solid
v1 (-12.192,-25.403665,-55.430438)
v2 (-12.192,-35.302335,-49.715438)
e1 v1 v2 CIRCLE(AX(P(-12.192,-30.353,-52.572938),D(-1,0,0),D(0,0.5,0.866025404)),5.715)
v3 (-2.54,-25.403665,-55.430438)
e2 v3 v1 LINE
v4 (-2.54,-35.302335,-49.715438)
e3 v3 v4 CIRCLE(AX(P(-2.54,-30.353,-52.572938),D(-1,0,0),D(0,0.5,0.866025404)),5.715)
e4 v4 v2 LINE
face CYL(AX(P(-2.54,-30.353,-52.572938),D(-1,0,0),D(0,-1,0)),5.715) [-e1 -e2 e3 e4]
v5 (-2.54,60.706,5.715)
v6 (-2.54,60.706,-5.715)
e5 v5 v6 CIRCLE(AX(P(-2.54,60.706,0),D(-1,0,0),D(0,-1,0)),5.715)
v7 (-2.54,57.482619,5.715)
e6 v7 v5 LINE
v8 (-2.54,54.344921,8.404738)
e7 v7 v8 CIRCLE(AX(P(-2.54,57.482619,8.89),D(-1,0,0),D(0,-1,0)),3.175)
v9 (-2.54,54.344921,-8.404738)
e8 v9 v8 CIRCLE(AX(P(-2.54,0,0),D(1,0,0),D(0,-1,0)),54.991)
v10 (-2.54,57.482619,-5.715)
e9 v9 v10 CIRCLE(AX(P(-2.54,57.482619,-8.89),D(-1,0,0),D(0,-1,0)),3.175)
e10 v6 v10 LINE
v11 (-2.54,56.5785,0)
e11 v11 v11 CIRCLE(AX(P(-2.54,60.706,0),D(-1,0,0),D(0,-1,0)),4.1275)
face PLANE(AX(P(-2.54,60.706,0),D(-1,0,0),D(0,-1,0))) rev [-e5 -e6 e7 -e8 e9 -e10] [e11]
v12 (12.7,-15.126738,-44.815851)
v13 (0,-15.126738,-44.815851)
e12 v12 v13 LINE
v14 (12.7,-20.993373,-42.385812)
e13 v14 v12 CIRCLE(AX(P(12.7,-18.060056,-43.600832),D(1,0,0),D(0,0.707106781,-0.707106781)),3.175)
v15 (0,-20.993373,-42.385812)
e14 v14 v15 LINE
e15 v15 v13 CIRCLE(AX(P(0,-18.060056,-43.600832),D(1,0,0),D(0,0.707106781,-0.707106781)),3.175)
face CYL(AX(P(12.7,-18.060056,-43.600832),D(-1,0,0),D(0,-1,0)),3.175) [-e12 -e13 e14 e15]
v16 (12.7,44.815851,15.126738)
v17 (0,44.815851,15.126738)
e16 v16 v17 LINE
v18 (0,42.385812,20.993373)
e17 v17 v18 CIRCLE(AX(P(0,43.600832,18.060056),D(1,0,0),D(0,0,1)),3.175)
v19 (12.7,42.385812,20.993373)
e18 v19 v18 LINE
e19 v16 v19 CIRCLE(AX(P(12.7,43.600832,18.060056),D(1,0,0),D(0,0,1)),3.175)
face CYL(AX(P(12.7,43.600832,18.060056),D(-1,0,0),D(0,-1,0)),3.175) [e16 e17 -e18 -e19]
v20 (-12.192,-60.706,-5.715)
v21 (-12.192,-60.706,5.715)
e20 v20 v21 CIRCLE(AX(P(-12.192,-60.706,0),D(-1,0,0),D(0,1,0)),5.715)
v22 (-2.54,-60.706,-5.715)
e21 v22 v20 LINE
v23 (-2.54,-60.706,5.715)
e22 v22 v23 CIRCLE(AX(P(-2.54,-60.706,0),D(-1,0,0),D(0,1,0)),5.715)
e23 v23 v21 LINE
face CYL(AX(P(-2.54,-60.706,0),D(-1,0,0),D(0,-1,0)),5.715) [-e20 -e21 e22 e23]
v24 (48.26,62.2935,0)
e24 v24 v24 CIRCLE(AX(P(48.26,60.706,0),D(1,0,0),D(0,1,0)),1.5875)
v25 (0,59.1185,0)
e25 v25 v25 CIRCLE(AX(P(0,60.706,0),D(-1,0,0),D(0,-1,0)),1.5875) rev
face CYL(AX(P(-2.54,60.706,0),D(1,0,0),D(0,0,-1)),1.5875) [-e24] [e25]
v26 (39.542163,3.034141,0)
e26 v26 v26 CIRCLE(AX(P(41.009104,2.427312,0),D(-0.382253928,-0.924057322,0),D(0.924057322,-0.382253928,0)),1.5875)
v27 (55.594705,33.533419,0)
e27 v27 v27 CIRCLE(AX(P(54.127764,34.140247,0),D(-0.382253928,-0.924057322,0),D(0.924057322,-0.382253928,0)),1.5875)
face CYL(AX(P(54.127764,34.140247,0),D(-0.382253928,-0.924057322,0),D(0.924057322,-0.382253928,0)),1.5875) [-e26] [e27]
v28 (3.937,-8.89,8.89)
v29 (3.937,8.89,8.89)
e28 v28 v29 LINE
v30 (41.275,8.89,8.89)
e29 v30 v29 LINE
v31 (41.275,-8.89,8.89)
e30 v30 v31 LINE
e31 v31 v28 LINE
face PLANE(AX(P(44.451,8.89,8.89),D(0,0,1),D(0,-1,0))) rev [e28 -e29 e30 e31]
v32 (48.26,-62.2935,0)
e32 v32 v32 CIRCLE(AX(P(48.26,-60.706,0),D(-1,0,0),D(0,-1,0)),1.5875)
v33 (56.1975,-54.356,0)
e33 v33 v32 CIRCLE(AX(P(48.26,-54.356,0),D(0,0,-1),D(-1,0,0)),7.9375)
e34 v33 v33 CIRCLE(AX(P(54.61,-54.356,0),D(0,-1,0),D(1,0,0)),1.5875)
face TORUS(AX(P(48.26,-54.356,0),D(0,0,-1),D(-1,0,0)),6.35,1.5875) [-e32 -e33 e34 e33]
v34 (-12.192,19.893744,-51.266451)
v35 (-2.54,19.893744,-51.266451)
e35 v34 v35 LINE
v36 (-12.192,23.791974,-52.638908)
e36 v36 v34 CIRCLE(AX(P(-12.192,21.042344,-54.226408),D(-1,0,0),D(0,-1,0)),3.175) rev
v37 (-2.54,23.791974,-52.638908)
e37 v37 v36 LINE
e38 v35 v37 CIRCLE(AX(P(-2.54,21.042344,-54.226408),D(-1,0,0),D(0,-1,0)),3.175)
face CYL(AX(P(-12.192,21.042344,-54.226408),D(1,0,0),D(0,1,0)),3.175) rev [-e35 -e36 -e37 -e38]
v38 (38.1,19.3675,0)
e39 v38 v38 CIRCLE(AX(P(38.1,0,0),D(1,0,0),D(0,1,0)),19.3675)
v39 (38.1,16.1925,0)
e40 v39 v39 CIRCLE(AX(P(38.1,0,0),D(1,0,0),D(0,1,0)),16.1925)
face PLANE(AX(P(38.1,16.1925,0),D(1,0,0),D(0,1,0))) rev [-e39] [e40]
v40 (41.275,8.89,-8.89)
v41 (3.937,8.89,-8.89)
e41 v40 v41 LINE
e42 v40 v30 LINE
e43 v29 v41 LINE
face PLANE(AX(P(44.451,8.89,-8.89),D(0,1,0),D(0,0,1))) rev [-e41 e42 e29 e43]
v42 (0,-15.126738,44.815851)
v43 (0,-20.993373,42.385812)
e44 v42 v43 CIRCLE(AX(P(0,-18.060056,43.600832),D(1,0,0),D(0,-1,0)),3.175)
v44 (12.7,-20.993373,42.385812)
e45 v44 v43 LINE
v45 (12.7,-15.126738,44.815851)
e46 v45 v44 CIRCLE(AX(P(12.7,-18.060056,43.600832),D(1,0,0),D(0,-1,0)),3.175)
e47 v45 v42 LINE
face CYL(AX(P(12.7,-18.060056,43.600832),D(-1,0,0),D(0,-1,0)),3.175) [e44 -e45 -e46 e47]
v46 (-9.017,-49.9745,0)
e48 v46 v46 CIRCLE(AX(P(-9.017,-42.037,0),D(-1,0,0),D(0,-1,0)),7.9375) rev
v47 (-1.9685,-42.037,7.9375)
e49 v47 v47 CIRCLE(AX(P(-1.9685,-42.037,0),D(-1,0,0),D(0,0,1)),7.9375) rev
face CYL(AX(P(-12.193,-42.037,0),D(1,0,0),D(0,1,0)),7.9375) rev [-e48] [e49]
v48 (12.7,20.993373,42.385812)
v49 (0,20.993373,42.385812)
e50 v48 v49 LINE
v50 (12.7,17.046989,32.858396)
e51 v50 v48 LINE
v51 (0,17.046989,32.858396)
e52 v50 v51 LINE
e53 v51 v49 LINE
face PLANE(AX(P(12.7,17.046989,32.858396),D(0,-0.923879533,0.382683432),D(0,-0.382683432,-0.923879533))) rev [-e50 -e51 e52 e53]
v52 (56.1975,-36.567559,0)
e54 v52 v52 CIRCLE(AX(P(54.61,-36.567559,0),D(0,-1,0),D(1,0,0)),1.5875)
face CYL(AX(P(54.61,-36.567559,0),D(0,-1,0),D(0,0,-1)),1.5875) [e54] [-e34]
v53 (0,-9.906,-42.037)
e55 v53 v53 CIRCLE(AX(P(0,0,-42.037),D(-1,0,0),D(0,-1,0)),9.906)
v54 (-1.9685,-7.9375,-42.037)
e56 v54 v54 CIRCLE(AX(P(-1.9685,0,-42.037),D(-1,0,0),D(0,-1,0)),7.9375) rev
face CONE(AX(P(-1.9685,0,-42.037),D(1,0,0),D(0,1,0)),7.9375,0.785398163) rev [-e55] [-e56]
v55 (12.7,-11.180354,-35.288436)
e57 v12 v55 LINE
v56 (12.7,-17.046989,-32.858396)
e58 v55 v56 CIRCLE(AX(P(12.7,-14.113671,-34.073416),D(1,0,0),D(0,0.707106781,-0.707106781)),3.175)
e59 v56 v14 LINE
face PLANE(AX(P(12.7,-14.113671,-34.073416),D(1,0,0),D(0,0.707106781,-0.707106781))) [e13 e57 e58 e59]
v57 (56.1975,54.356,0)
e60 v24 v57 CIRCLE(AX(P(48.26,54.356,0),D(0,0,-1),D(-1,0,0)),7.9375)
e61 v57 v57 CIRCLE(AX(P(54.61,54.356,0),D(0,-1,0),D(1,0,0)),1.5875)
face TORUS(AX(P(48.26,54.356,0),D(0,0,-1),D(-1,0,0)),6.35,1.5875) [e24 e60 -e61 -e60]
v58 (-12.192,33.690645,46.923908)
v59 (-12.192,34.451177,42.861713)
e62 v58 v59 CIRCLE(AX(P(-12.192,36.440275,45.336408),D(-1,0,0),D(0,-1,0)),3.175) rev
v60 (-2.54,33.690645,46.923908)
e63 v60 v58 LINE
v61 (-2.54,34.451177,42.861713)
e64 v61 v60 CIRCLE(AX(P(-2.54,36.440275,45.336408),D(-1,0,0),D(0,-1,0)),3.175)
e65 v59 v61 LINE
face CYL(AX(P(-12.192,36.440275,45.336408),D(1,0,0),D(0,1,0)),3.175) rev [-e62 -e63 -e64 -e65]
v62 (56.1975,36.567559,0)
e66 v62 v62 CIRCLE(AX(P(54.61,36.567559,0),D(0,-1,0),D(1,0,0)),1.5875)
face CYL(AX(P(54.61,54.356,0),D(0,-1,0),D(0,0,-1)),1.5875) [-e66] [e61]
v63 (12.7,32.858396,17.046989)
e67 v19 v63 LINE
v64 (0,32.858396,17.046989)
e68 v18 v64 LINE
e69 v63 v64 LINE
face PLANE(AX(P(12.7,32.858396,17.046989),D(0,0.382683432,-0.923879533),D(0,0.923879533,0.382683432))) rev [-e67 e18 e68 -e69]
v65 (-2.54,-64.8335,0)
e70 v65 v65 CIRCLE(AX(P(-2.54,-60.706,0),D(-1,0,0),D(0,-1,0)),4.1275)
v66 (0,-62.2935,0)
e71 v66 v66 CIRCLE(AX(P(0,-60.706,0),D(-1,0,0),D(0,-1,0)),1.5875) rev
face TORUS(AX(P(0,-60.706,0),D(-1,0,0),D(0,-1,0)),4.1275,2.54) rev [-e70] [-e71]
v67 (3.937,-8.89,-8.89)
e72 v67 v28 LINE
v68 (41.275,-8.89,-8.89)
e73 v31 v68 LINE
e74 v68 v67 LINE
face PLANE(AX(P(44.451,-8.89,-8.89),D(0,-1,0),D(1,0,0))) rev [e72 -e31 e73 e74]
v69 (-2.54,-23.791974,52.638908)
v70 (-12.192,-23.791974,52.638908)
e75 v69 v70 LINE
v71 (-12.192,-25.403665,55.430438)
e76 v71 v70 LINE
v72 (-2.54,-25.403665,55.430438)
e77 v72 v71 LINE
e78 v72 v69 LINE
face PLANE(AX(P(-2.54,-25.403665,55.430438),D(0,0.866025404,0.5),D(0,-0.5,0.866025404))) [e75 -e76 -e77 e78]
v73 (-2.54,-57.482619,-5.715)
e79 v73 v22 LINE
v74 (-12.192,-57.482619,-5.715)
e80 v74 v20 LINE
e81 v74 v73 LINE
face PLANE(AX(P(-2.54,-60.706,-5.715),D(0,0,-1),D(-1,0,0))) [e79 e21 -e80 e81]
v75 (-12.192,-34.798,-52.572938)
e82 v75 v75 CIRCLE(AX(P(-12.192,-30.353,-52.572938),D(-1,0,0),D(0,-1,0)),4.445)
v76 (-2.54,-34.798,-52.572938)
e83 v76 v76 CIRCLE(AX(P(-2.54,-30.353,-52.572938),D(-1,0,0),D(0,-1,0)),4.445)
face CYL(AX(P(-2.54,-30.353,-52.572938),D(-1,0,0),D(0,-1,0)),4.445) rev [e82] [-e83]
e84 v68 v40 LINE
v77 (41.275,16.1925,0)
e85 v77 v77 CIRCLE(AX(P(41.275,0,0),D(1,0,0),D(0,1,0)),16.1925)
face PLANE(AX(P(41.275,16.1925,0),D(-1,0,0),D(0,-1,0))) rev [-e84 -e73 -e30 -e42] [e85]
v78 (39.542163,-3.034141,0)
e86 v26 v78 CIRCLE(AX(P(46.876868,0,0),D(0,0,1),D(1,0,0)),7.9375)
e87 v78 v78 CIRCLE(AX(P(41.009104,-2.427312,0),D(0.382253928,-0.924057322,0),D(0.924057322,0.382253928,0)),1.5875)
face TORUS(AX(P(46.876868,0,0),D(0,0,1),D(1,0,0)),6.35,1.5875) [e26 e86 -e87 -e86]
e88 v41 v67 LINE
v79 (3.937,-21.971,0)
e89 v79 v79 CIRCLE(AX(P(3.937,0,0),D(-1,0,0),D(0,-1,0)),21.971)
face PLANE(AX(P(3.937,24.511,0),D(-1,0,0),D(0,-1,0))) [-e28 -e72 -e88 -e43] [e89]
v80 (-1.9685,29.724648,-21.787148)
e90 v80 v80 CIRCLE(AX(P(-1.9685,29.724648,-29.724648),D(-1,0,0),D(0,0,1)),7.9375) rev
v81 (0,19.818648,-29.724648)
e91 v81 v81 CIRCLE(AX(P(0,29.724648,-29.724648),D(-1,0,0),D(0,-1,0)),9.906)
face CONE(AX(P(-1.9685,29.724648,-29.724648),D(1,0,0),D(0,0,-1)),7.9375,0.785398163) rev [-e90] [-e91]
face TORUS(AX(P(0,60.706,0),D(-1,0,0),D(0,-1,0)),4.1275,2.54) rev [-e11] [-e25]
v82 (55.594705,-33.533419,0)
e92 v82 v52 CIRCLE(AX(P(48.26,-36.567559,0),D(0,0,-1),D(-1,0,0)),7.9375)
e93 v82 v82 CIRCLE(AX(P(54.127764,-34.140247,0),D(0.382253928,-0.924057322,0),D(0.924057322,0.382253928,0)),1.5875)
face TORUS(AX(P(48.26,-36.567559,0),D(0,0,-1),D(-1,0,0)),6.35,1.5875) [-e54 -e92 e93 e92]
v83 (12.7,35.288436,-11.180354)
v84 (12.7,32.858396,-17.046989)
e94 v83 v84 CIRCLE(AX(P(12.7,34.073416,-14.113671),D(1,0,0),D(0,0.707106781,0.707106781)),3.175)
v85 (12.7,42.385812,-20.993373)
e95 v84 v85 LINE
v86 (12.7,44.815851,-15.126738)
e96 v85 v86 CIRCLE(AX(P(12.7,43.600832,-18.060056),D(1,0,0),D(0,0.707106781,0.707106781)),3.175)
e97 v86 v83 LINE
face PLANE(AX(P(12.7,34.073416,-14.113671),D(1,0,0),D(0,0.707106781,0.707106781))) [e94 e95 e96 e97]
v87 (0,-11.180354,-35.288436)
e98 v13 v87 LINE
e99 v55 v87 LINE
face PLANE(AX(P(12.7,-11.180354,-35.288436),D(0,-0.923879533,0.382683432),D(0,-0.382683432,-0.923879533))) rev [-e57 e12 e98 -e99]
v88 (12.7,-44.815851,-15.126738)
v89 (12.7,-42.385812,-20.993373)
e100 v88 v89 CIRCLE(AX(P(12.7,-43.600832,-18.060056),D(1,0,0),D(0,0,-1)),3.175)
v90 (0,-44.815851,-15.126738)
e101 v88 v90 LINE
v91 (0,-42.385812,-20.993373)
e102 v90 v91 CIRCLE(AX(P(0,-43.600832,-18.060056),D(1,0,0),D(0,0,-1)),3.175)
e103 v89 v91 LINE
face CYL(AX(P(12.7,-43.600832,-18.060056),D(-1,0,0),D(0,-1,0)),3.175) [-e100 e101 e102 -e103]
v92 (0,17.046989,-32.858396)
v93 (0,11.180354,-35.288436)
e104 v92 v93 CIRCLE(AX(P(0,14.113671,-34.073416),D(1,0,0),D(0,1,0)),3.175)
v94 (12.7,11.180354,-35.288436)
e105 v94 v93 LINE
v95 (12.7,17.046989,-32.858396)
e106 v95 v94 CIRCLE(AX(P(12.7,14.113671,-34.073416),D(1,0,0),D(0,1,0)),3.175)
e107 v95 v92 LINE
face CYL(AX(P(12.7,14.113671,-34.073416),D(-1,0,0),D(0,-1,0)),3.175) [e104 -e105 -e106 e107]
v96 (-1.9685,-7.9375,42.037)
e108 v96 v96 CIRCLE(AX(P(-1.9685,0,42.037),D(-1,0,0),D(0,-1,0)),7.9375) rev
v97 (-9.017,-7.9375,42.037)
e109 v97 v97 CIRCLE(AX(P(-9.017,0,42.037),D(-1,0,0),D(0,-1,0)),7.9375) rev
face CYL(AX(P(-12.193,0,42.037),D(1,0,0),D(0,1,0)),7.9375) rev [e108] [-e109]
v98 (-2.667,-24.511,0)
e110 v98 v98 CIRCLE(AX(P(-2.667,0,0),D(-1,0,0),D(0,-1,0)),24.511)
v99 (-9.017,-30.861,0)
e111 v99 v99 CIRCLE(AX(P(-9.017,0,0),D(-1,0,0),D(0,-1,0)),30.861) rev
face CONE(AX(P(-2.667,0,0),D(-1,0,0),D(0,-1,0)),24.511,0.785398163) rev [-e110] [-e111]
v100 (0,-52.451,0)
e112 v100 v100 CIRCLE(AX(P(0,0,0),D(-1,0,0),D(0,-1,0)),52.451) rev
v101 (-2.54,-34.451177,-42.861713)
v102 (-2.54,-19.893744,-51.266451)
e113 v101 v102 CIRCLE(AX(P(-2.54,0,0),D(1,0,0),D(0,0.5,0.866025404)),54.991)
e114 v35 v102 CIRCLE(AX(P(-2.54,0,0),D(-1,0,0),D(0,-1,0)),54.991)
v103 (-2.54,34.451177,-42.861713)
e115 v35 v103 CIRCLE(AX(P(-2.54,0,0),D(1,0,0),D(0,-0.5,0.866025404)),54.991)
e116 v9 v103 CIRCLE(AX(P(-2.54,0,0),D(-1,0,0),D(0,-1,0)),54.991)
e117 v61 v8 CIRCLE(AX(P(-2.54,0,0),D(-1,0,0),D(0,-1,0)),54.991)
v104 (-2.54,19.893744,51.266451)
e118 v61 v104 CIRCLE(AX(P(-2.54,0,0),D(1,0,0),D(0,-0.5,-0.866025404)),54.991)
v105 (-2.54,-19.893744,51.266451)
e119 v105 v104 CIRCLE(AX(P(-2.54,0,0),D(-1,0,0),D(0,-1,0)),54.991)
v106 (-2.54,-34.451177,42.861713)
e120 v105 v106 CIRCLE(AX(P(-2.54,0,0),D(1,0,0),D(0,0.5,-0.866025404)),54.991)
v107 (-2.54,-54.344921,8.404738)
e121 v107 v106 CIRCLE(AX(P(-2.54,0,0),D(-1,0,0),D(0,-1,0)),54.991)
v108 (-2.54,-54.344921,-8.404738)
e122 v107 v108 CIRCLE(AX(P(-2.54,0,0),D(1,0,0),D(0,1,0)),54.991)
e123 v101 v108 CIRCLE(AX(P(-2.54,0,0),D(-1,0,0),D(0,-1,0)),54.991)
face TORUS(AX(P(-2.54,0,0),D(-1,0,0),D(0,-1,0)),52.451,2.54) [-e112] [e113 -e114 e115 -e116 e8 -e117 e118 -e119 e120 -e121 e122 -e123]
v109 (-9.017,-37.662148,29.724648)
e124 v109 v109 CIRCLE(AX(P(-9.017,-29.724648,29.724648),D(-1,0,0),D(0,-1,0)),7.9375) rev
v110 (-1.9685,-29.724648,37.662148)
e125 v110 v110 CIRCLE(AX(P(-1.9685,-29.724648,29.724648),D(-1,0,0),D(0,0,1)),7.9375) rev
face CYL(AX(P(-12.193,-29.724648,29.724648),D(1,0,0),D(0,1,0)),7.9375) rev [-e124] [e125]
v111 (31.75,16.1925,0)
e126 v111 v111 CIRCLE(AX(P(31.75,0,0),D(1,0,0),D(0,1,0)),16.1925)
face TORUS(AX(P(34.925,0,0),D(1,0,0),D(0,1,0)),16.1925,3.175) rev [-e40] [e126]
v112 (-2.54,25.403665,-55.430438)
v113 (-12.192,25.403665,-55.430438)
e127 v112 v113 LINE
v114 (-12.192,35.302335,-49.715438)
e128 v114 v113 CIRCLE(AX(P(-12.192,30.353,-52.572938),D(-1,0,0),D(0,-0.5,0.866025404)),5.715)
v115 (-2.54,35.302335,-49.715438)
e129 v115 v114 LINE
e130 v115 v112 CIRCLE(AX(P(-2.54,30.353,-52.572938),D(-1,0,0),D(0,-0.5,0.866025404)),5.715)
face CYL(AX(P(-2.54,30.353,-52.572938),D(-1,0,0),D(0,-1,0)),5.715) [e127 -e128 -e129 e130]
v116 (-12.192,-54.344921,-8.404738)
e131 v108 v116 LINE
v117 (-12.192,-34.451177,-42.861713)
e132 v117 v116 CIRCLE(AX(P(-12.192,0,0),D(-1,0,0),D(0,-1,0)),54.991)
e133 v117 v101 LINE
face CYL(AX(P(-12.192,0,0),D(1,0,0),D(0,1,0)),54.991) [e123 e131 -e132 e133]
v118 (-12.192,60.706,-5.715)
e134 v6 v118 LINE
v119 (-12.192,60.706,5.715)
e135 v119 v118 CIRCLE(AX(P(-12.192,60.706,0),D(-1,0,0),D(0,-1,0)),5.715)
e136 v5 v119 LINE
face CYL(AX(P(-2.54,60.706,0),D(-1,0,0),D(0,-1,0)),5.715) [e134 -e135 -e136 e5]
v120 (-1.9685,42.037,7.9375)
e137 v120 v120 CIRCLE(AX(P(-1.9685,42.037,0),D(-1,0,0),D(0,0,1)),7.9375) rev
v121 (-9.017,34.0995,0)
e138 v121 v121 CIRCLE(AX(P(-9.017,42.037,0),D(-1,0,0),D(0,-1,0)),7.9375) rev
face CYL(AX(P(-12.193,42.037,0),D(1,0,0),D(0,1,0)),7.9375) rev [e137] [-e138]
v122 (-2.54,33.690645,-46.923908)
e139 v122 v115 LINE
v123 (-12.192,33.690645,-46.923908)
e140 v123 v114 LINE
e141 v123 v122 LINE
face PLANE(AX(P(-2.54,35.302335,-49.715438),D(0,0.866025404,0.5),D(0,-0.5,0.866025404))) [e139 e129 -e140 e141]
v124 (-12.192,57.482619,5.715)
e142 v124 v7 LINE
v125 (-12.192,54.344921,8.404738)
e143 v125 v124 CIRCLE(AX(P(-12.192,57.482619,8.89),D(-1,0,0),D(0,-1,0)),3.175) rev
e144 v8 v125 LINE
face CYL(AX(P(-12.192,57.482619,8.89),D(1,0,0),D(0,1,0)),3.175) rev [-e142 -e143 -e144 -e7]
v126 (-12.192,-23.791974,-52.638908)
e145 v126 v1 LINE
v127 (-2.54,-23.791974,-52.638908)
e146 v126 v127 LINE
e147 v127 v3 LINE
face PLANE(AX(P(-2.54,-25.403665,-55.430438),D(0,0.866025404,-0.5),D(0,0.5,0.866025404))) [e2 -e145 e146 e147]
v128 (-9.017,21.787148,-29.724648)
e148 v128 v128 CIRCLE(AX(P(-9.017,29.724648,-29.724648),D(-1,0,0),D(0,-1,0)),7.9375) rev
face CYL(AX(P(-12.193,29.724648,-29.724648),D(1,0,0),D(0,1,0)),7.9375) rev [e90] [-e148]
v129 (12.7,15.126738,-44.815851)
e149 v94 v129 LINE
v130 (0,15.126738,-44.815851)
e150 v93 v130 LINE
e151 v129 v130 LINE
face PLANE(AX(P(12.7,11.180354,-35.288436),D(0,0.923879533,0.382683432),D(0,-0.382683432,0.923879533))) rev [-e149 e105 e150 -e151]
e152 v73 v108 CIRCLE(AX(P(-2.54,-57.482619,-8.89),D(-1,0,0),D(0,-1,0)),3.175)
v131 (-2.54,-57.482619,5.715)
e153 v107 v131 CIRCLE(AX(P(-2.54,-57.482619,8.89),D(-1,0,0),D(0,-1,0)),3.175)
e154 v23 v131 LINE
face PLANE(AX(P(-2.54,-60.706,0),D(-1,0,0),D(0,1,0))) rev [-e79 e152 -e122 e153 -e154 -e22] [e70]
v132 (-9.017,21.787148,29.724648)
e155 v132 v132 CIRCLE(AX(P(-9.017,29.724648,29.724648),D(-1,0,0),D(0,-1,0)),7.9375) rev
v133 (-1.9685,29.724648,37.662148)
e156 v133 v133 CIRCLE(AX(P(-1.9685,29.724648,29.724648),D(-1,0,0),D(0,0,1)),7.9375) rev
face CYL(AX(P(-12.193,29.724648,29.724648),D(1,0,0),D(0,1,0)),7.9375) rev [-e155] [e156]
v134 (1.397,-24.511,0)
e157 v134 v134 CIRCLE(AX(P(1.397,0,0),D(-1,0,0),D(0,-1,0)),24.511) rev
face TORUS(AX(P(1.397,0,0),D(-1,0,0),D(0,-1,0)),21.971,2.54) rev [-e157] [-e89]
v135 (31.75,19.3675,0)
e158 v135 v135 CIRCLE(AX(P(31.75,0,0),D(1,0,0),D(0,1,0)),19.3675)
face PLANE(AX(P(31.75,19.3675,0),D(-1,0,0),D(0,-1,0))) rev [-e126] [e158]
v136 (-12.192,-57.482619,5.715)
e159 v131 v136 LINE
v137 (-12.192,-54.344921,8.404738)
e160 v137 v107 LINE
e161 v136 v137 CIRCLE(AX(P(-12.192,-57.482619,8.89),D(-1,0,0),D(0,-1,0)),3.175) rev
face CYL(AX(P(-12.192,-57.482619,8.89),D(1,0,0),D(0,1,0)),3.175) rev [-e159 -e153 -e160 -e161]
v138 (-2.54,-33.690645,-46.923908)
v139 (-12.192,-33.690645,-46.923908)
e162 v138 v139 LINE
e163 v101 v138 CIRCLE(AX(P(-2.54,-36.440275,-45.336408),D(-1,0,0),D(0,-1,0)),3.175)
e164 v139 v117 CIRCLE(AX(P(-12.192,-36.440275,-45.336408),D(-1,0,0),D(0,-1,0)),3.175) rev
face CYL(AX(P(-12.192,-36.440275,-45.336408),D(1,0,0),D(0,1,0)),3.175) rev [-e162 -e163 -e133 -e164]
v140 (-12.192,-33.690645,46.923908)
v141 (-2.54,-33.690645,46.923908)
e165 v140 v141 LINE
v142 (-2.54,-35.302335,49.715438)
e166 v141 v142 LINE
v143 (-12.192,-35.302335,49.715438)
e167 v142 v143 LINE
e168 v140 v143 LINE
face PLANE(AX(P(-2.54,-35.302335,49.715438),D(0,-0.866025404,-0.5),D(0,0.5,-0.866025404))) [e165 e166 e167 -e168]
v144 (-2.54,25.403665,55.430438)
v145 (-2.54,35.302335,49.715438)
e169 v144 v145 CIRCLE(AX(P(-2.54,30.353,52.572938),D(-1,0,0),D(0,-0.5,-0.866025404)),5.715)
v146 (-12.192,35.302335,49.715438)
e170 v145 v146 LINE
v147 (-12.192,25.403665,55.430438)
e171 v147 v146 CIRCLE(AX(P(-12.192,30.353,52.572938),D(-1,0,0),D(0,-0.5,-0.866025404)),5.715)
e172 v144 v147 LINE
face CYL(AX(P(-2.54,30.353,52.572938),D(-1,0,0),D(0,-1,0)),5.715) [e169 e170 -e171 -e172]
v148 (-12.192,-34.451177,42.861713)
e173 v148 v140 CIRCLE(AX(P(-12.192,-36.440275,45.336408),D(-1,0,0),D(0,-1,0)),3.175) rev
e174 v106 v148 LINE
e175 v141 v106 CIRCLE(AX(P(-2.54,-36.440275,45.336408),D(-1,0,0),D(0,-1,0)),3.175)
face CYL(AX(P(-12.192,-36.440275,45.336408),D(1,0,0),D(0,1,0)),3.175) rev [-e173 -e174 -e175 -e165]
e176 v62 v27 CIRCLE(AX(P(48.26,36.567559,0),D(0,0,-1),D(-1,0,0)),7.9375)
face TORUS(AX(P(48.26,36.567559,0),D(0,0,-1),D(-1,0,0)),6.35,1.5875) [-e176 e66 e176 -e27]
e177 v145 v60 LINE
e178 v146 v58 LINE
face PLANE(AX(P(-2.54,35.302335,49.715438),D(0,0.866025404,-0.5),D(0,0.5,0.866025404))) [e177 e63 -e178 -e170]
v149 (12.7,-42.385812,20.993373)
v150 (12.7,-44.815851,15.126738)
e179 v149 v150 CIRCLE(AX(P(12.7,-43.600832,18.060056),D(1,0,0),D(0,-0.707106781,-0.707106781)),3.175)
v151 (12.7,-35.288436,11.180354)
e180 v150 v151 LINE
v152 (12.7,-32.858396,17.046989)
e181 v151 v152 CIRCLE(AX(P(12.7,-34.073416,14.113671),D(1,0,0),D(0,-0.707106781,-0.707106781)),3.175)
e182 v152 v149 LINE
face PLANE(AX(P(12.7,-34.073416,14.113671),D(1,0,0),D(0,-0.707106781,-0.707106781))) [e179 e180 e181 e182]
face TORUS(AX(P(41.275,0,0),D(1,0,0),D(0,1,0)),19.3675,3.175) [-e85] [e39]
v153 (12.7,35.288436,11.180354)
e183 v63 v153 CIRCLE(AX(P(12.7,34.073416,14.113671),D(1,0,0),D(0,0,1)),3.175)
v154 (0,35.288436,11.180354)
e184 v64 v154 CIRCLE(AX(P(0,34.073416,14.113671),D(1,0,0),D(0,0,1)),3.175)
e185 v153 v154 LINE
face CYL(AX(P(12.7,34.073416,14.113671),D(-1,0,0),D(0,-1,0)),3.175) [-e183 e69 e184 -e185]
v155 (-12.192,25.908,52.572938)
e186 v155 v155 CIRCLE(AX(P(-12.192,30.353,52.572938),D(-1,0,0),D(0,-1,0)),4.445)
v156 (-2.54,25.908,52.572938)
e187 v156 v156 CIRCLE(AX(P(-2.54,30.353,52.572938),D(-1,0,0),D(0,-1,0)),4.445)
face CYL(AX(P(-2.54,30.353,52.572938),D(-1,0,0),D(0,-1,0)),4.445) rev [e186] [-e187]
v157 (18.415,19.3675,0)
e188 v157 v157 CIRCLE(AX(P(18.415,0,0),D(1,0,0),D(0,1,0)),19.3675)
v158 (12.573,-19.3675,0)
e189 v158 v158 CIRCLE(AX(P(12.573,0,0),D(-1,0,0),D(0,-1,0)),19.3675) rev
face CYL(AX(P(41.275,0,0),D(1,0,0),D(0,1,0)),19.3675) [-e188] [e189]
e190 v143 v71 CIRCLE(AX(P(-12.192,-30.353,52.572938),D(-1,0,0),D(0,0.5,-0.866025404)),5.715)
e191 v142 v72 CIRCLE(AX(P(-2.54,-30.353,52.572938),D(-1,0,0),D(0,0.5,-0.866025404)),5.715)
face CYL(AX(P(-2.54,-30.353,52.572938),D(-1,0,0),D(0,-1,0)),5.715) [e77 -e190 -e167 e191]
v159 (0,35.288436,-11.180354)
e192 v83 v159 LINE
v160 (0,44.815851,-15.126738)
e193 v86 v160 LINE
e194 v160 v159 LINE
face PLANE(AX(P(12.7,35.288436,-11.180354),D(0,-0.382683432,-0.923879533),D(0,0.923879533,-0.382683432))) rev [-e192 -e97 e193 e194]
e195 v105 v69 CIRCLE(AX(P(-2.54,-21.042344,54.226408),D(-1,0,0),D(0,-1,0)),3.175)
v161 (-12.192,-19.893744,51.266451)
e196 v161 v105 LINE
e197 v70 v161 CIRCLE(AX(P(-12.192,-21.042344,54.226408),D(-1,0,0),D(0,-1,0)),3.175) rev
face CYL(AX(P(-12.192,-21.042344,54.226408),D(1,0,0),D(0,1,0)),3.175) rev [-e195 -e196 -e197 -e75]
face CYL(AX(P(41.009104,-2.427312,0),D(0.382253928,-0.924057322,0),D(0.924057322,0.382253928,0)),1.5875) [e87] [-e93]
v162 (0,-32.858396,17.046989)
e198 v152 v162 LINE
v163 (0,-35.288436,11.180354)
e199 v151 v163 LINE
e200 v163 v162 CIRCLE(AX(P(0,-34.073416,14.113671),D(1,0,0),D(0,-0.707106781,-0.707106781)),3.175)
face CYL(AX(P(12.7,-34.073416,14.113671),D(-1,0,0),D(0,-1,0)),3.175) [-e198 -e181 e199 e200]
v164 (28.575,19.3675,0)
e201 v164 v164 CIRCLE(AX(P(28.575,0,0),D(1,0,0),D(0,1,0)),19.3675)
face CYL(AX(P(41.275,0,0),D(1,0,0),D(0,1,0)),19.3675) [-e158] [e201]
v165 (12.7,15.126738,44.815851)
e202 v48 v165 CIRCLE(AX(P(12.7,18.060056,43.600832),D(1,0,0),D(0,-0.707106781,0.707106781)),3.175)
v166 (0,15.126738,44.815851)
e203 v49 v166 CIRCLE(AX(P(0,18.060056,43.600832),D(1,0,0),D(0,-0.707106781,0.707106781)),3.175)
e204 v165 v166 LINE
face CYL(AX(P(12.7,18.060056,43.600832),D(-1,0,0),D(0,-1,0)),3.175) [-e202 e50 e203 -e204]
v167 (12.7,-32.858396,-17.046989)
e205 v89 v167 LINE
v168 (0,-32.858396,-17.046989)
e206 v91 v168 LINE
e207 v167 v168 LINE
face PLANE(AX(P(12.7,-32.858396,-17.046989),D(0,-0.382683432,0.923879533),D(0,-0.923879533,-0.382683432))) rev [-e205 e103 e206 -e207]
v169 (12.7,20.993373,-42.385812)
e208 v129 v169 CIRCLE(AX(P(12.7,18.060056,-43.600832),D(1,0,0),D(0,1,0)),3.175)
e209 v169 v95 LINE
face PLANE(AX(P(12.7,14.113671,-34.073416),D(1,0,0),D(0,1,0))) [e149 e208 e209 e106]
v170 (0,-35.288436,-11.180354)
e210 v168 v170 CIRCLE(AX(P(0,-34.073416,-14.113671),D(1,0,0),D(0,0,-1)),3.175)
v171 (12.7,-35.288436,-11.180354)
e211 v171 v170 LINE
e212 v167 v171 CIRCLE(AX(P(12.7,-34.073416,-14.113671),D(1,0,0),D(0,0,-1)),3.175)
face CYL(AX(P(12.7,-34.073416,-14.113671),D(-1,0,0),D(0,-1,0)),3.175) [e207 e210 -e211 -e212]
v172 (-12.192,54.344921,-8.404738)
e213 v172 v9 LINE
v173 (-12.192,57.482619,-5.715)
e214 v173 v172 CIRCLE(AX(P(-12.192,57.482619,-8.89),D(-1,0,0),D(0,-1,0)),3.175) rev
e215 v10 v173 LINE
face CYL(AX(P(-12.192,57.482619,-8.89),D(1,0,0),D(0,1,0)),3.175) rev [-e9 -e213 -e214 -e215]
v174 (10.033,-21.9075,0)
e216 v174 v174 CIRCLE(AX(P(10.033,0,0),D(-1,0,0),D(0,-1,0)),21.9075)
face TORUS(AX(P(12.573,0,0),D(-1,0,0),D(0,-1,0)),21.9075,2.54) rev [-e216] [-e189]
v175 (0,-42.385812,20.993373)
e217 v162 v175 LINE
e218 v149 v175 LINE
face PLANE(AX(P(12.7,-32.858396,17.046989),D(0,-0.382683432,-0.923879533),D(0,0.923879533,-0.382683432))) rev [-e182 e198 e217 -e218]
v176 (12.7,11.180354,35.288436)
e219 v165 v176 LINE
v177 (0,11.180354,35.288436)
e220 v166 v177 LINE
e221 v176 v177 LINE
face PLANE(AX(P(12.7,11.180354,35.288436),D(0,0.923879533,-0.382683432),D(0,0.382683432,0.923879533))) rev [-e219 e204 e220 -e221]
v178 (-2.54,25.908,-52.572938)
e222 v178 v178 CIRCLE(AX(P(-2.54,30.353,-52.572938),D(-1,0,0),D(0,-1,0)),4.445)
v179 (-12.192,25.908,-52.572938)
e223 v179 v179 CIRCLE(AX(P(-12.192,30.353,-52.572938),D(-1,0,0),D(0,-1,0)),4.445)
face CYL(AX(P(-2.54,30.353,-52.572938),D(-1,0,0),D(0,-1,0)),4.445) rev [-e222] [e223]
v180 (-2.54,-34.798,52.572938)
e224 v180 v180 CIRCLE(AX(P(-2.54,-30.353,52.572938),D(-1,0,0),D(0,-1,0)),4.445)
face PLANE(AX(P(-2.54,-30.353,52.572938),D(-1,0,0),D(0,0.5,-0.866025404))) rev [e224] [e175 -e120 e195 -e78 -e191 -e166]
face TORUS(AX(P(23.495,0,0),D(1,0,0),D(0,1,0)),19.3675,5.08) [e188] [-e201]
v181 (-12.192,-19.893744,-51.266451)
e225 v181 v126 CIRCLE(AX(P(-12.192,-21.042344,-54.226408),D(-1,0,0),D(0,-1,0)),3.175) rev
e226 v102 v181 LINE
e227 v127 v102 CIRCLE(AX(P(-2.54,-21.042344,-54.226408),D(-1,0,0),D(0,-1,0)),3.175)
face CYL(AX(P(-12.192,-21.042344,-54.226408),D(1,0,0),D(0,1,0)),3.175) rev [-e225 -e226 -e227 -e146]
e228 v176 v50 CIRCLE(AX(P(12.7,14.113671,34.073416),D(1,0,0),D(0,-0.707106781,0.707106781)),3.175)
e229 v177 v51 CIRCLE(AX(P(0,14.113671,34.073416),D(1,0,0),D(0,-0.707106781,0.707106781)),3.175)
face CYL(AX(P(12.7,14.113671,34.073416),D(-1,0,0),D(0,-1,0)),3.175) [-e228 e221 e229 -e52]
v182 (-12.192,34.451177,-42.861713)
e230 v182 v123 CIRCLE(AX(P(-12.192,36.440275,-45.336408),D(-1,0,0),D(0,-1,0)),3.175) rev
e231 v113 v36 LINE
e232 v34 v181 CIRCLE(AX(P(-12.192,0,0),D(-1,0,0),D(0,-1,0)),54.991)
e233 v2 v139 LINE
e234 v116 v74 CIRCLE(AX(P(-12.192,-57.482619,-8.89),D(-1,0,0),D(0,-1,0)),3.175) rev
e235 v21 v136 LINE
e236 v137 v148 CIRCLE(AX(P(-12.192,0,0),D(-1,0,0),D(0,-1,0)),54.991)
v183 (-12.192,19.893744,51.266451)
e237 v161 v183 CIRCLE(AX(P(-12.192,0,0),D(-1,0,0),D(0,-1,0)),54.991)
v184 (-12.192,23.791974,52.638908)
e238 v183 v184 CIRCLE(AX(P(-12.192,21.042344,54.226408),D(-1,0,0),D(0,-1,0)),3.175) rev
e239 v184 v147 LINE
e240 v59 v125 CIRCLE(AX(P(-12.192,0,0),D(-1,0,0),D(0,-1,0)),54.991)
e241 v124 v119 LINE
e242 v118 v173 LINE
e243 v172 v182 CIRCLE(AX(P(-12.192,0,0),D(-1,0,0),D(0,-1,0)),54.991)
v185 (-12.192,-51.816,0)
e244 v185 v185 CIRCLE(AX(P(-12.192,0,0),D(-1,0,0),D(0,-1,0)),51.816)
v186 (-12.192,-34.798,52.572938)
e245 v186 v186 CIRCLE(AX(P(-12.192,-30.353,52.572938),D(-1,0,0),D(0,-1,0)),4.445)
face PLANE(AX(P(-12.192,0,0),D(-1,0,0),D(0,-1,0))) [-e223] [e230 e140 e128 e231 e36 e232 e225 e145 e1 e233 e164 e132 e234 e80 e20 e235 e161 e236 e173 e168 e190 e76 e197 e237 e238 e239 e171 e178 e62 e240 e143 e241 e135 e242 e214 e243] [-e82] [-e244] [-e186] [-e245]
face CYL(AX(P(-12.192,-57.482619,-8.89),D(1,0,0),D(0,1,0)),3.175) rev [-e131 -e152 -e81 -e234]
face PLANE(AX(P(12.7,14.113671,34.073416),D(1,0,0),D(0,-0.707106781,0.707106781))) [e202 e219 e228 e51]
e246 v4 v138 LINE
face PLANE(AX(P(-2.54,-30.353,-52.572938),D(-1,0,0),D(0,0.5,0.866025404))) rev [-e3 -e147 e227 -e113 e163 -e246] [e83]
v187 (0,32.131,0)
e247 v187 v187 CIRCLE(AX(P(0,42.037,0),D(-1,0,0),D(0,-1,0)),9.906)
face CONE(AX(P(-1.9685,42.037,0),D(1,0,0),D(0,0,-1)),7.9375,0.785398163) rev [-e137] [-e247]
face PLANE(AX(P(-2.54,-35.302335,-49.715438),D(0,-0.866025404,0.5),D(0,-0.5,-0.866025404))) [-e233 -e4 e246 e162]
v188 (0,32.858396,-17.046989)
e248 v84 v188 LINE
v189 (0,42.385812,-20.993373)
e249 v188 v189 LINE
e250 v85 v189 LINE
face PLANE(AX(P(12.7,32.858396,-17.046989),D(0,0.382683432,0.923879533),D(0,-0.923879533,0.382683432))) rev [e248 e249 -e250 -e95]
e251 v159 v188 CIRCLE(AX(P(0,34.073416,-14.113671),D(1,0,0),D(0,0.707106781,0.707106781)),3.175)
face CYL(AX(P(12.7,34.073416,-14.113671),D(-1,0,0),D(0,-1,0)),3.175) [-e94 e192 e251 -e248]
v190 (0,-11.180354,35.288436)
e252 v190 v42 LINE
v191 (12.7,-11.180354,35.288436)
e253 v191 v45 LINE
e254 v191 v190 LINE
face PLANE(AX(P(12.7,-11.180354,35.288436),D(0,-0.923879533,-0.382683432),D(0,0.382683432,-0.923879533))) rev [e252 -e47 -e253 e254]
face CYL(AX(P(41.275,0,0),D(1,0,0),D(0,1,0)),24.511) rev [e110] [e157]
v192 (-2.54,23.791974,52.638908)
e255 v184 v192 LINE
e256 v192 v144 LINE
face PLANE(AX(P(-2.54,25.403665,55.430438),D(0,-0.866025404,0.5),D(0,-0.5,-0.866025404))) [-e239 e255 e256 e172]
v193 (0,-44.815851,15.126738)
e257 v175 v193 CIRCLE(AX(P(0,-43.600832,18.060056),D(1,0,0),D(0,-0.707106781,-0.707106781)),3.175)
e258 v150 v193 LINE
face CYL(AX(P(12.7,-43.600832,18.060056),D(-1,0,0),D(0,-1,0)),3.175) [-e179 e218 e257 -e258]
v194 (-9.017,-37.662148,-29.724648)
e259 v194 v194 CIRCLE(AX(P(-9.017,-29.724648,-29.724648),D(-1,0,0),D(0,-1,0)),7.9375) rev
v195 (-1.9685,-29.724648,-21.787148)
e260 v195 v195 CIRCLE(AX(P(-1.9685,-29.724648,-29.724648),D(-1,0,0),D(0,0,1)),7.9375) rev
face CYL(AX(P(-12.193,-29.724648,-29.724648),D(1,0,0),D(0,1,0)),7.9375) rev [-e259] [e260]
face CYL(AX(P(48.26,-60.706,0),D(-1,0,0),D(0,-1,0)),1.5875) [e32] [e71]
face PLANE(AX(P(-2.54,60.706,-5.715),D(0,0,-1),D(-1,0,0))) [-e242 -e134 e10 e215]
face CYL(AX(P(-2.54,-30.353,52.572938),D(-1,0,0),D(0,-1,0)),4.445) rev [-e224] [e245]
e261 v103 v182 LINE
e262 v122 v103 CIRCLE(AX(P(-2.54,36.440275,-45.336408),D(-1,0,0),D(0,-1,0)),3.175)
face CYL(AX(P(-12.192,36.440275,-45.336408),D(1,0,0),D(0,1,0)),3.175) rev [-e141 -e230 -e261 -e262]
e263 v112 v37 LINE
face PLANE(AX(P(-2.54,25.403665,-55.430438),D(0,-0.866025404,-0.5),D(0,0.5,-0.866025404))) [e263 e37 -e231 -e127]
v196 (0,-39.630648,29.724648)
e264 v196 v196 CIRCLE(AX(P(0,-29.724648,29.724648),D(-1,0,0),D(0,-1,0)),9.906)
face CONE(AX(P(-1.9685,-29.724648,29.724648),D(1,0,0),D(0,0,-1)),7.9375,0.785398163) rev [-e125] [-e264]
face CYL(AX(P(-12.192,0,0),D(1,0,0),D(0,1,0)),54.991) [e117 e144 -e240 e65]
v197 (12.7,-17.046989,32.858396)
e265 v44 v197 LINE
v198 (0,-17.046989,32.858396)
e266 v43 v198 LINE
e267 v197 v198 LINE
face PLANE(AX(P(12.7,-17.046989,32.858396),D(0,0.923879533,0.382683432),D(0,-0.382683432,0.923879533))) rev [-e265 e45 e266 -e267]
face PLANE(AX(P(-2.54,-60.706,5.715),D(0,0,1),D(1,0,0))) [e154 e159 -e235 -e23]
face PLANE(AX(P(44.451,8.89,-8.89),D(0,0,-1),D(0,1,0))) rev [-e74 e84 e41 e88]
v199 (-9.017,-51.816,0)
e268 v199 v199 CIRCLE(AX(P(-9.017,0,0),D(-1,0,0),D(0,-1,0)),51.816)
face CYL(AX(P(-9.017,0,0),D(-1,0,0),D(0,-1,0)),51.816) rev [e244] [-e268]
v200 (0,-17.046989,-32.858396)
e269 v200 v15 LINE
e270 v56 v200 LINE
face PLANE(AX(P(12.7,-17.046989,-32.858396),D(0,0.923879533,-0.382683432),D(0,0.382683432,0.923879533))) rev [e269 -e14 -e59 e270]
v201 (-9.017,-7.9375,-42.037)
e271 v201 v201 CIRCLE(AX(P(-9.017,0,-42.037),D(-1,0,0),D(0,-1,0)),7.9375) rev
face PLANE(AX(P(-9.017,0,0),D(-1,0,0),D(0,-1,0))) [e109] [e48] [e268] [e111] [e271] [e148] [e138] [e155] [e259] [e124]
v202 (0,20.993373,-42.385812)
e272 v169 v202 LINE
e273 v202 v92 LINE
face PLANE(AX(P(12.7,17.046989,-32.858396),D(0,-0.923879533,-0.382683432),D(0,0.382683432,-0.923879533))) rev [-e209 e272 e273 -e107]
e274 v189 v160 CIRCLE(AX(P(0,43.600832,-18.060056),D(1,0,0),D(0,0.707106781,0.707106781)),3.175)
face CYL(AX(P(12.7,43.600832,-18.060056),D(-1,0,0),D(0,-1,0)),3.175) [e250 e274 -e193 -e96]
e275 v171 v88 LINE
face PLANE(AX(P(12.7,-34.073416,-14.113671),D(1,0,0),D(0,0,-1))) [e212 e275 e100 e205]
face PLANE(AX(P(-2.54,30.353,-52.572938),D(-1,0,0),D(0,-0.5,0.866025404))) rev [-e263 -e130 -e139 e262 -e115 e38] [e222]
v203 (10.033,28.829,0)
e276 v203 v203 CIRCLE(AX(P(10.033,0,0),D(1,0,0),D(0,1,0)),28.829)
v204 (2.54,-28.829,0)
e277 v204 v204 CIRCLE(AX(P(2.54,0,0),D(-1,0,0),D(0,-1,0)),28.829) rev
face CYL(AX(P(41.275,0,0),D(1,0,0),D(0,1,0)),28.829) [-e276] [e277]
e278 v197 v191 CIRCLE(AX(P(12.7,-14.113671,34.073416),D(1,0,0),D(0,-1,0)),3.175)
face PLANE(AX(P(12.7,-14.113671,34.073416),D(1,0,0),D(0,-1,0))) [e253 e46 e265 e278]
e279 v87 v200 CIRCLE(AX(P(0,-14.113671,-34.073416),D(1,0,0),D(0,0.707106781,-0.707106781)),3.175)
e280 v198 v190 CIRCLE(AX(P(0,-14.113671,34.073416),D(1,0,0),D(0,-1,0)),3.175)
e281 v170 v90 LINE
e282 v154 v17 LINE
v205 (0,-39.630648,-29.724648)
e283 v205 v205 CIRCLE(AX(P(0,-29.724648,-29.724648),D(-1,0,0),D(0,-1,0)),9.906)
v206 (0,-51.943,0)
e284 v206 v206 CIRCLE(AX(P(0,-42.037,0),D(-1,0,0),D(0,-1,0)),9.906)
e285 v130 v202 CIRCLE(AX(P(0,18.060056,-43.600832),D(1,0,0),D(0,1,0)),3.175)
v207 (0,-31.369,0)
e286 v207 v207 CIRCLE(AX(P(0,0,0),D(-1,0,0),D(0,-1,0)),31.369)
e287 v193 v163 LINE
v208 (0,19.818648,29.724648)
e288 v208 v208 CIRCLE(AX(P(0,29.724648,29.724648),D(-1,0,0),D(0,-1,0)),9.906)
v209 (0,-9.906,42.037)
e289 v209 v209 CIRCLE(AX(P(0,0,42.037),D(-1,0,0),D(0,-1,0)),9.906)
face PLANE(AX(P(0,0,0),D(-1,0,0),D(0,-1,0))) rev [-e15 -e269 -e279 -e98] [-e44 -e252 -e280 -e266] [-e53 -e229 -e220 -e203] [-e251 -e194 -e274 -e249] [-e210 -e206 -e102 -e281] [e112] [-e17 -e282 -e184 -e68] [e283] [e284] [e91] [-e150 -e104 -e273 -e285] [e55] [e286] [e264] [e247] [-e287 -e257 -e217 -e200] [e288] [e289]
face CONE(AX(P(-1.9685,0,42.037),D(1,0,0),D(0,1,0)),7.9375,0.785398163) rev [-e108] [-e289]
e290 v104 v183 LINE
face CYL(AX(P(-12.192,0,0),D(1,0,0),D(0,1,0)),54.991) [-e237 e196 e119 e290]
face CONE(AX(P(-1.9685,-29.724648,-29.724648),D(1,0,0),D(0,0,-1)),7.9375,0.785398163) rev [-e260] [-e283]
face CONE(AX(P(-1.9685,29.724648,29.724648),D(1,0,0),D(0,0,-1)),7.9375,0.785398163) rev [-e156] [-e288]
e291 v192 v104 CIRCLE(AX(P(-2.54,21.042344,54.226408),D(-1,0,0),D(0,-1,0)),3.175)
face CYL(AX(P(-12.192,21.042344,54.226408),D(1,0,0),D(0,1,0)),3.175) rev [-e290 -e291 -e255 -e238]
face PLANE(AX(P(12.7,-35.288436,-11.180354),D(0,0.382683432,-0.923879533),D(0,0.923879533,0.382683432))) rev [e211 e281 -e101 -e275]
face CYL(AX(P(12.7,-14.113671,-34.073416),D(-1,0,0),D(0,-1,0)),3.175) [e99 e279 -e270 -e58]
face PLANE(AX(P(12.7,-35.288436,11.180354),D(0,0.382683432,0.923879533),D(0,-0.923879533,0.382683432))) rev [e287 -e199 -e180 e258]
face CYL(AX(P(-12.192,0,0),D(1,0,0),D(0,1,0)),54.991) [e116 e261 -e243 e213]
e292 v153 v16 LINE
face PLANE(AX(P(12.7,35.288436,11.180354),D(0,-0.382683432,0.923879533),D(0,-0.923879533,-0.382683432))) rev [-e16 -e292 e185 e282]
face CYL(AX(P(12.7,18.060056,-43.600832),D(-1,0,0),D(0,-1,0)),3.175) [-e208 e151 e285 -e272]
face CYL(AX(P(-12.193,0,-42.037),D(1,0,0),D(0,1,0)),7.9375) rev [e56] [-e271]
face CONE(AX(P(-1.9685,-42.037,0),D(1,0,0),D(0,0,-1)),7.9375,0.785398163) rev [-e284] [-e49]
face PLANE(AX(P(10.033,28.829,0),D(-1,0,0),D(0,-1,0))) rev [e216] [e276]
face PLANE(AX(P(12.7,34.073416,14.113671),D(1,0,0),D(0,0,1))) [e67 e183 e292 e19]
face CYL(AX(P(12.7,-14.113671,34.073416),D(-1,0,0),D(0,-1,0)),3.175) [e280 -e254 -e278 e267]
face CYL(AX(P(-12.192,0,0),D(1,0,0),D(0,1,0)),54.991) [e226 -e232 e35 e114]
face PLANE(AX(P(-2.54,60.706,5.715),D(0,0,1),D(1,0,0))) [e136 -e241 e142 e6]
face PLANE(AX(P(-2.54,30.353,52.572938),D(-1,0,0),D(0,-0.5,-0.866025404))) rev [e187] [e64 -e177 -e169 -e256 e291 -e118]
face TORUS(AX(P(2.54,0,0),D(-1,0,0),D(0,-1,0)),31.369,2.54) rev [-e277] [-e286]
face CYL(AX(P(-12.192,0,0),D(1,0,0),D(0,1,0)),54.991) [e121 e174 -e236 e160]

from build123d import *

# Parameters (mm, degrees)
CUT_EXTRUDE2_REACH           = 59.476
SKETCH2_W                    = 17.78
SKETCH2_H                    = 17.78
BOSS_EXTRUDE1_START          = 12.192
SKETCH3_R                    = 54.991
SKETCH3_R_2                  = 24.511
BOSS_EXTRUDE1_DEPTH          = 12.192
SKETCH5_R                    = 51.816
CUT_EXTRUDE4_DEPTH           = 3.175
CHAMFER1_SIZE                = 6.35
CUT_EXTRUDE3_REACH           = 91.576
SKETCH4_R                    = 7.9375
BOSS_EXTRUDE2_DEPTH          = 12.7
CHAMFER2_SIZE                = 1.9685
CIRPATTERN1_COUNT            = 8
CHAMFER2_OF_CIRPATTERN1_SIZE = 1.9685
BOSS_EXTRUDE3_DEPTH          = 9.652
FILLET1_R                    = 3.175
CIRPATTERN2_COUNT            = 6
FILLET1_OF_CIRPATTERN2_R     = 3.175
SKETCH8_R                    = 4.445
CUT_EXTRUDE5_DEPTH           = 9.652
SKETCH10_R                   = 1.5875
FILLET2_R                    = 2.54


with BuildPart() as part:
    # Sketch1 → Revolve1 (revolve)
    with BuildSketch(Plane.XY):
        with BuildLine():
            Line((0, 24.511), (0, 28.829))
            Line((0, 28.829), (10.033, 28.829))
            Line((10.033, 28.829), (10.033, 19.3675))
            Line((10.033, 19.3675), (18.415, 19.3675))
            ThreePointArc((18.415, 19.3675), (23.495, 24.4475), (28.575, 19.3675))
            Line((28.575, 19.3675), (31.75, 19.3675))
            Line((31.75, 19.3675), (31.75, 16.1925))
            ThreePointArc((31.75, 16.1925), (34.925, 13.0175), (38.1, 16.1925))
            Line((38.1, 16.1925), (38.1, 19.3675))
            ThreePointArc((38.1, 19.3675), (43.52006403, 21.61256403), (41.275, 16.1925))
            Line((41.275, 16.1925), (41.275, 0))
            Line((41.275, 0), (3.937, 0))
            Line((3.937, 0), (3.937, 24.511))
            Line((3.937, 24.511), (0, 24.511))
        make_face()
    revolve(axis=Axis((41.275, 0, 0), (-1, 0, 0)))

    # Sketch2 → Cut-Extrude2 (cut, up to next)
    with BuildSketch(Plane.ZY.offset(-3.937), mode=Mode.PRIVATE) as cut_extrude2_sk1:
        Rectangle(SKETCH2_W, SKETCH2_H)
    cut_extrude2_tool1 = extrude(cut_extrude2_sk1.sketch, amount=-CUT_EXTRUDE2_REACH, mode=Mode.PRIVATE) & part.part
    add(cut_extrude2_tool1.solids().sort_by_distance((3.937, 0, 0))[0], mode=Mode.SUBTRACT)

    # Sketch3 → Boss-Extrude1 (add)
    with BuildSketch(Plane.ZY.offset(BOSS_EXTRUDE1_START)):
        with Locations(Location((0, 0, 0), (0, 0, 90))):
            Circle(SKETCH3_R)
        with Locations(Location((0, 0, 0), (0, 0, 90))):
            Circle(SKETCH3_R_2, mode=Mode.SUBTRACT)
    extrude(amount=-BOSS_EXTRUDE1_DEPTH)

    # Sketch5 → Cut-Extrude4 (cut)
    with BuildSketch(Plane.ZY.offset(12.192)):
        with Locations(Location((0, 0, 0), (0, 0, 270))):
            Circle(SKETCH5_R)
    extrude(amount=-CUT_EXTRUDE4_DEPTH, mode=Mode.SUBTRACT)

    # Chamfer1
    chamfer1_edges = [part.edges().sort_by_distance(p)[0] for p in [
        (-9.017, -24.511, 0),
    ]]
    chamfer(chamfer1_edges, length=CHAMFER1_SIZE)

    # Sketch4 → Cut-Extrude3 (cut, up to next)
    with BuildSketch(Plane(origin=(0, 0, 0), x_dir=(0, 0, -1), z_dir=(1, 0, 0)), mode=Mode.PRIVATE) as cut_extrude3_sk1:
        with Locations(Location((29.724647761, 29.724647761, 0), (0, 0, 90))):
            Circle(SKETCH4_R)
    cut_extrude3_tool1 = extrude(cut_extrude3_sk1.sketch, amount=-CUT_EXTRUDE3_REACH, mode=Mode.PRIVATE) & part.part
    cut_extrude3 = cut_extrude3_tool1.solids().sort_by_distance((0, 29.724648, -29.724648))[0]
    add(cut_extrude3, mode=Mode.SUBTRACT)

    # Sketch6 → Boss-Extrude2 (add)
    with BuildSketch(Plane(origin=(0, 0, 0), x_dir=(0, 0, -1), z_dir=(1, 0, 0))):
        with BuildLine():
            Line((32.858396365, 17.046988648), (42.385811656, 20.993373276))
            ThreePointArc((42.385811656, 20.993373276), (46.534149069, 19.275075658), (44.815851451, 15.126738245))
            Line((44.815851451, 15.126738245), (35.28843616, 11.180353617))
            ThreePointArc((35.28843616, 11.180353617), (31.140098747, 12.898651235), (32.858396365, 17.046988648))
        make_face()
    boss_extrude2 = extrude(amount=BOSS_EXTRUDE2_DEPTH)

    # Chamfer2
    chamfer2_edges = [part.edges().sort_by_distance(p)[0] for p in [
        (0, 21.787147761, -29.724647761),
    ]]
    chamfer(chamfer2_edges, length=CHAMFER2_SIZE)

    # CirPattern1: Cut-Extrude3, Boss-Extrude2 ×8 about axis
    cirpattern1_axis = Axis((0, 0, 0), (1, 0, 0))
    add([cut_extrude3.rotate(cirpattern1_axis, i * 360 / CIRPATTERN1_COUNT) for i in range(1, CIRPATTERN1_COUNT)], mode=Mode.SUBTRACT)
    add([boss_extrude2.rotate(cirpattern1_axis, i * 360 / CIRPATTERN1_COUNT) for i in range(1, CIRPATTERN1_COUNT)])

    # Chamfer2 of CirPattern1
    chamfer2_of_cirpattern1_edges = [part.edges().sort_by_distance(p)[0] for p in [
        (0, 36.424339924, -5.612660076),
        (0, 29.724647761, 21.787147761),
        (0, 5.612660076, 36.424339924),
        (0, -21.787147761, 29.724647761),
        (0, -36.424339924, 5.612660076),
        (0, -29.724647761, -21.787147761),
        (0, -5.612660076, -36.424339924),
    ]]
    chamfer(chamfer2_of_cirpattern1_edges, length=CHAMFER2_OF_CIRPATTERN1_SIZE)

    # Sketch7 → Boss-Extrude3 (add)
    with BuildSketch(Plane.ZY.offset(12.192)):
        with BuildLine():
            Line((5.715, 60.706), (5.715, 54.693224955))
            ThreePointArc((5.715, 54.693224955), (0, 54.991), (-5.715, 54.693224955))
            Line((-5.715, 54.693224955), (-5.715, 60.706))
            ThreePointArc((-5.715, 60.706), (0, 66.421), (5.715, 60.706))
        make_face()
    boss_extrude3 = extrude(amount=-BOSS_EXTRUDE3_DEPTH)

    # Fillet1
    fillet1_edges = [part.edges().sort_by_distance(p)[0] for p in [
        (-7.366, 54.693224955, 5.715),
        (-7.366, 54.693224955, -5.715),
    ]]
    fillet(fillet1_edges, radius=FILLET1_R)

    # CirPattern2: Boss-Extrude3 ×6 about axis
    cirpattern2_axis = Axis((0, 0, 0), (1, 0, 0))
    for i in range(1, CIRPATTERN2_COUNT):
        add(boss_extrude3.rotate(cirpattern2_axis, i * 360 / CIRPATTERN2_COUNT))

    # Fillet1 of CirPattern2
    fillet1_of_cirpattern2_edges = [part.edges().sort_by_distance(p)[0] for p in [
        (-7.366, 22.397277295, 50.223222226),
        (-7.366, 32.29594766, 44.508222226),
        (-7.366, -32.29594766, 44.508222226),
        (-7.366, -22.397277295, 50.223222226),
        (-7.366, -54.693224955, -5.715),
        (-7.366, -54.693224955, 5.715),
        (-7.366, -22.397277295, -50.223222226),
        (-7.366, -32.29594766, -44.508222226),
        (-7.366, 32.29594766, -44.508222226),
        (-7.366, 22.397277295, -50.223222226),
    ]]
    fillet(fillet1_of_cirpattern2_edges, radius=FILLET1_OF_CIRPATTERN2_R)

    # Sketch8 → Cut-Extrude5 (cut)
    with BuildSketch(Plane.ZY.offset(12.192)):
        with Locations(Location((52.572938162, 30.353, 0), (0, 0, 270))):
            Circle(SKETCH8_R)
        with Locations(Location((52.572938162, -30.353, 0), (0, 0, 270))):
            Circle(SKETCH8_R)
        with Locations(Location((-52.572938162, -30.353, 0), (0, 0, 270))):
            Circle(SKETCH8_R)
        with Locations(Location((-52.572938162, 30.353, 0), (0, 0, 270))):
            Circle(SKETCH8_R)
    extrude(amount=-CUT_EXTRUDE5_DEPTH, mode=Mode.SUBTRACT)

    # Sweep1: sweep along a path in Sketch9
    with BuildLine(Plane.XY) as sweep1_path:
        Line((-2.54, 60.706), (48.26, 60.706))
        ThreePointArc((48.26, 60.706), (52.750128061, 58.846128061), (54.61, 54.356))
        Line((54.61, 54.356), (54.61, 36.567559318))
        ThreePointArc((54.61, 36.567559318), (54.488274294, 35.330183338), (54.127763995, 34.140246875))
        Line((54.127763995, 34.140246875), (41.009104069, 2.427312444))
        ThreePointArc((41.009104069, 2.427312444), (40.526868063, 0), (41.009104069, -2.427312444))
        Line((41.009104069, -2.427312444), (54.127763995, -34.140246875))
        ThreePointArc((54.127763995, -34.140246875), (54.488274294, -35.330183338), (54.61, -36.567559318))
        Line((54.61, -36.567559318), (54.61, -54.356))
        ThreePointArc((54.61, -54.356), (52.750128061, -58.846128061), (48.26, -60.706))
        Line((48.26, -60.706), (-2.54, -60.706))
    # Sketch10 → Sweep1 (sweep)
    with BuildSketch(Plane(origin=(-2.54, 0, 0), x_dir=(0, 0, -1), z_dir=(1, 0, 0))):
        with Locations((0, 60.706)):
            Circle(SKETCH10_R)
    sweep(path=sweep1_path.line)

    # Fillet2
    fillet2_edges = [part.edges().sort_by_distance(p)[0] for p in [
        (3.937, -24.511, 0),
        (10.033, -19.3675, 0),
        (0, -28.829, 0),
        (0, -54.991, 0),
        (-2.54, -60.706, 1.5875),
        (-2.54, 60.706, 1.5875),
    ]]
    fillet(fillet2_edges, radius=FILLET2_R - 0.0001)  # a hair under: the kernel refuses the full size


solid = part.part
